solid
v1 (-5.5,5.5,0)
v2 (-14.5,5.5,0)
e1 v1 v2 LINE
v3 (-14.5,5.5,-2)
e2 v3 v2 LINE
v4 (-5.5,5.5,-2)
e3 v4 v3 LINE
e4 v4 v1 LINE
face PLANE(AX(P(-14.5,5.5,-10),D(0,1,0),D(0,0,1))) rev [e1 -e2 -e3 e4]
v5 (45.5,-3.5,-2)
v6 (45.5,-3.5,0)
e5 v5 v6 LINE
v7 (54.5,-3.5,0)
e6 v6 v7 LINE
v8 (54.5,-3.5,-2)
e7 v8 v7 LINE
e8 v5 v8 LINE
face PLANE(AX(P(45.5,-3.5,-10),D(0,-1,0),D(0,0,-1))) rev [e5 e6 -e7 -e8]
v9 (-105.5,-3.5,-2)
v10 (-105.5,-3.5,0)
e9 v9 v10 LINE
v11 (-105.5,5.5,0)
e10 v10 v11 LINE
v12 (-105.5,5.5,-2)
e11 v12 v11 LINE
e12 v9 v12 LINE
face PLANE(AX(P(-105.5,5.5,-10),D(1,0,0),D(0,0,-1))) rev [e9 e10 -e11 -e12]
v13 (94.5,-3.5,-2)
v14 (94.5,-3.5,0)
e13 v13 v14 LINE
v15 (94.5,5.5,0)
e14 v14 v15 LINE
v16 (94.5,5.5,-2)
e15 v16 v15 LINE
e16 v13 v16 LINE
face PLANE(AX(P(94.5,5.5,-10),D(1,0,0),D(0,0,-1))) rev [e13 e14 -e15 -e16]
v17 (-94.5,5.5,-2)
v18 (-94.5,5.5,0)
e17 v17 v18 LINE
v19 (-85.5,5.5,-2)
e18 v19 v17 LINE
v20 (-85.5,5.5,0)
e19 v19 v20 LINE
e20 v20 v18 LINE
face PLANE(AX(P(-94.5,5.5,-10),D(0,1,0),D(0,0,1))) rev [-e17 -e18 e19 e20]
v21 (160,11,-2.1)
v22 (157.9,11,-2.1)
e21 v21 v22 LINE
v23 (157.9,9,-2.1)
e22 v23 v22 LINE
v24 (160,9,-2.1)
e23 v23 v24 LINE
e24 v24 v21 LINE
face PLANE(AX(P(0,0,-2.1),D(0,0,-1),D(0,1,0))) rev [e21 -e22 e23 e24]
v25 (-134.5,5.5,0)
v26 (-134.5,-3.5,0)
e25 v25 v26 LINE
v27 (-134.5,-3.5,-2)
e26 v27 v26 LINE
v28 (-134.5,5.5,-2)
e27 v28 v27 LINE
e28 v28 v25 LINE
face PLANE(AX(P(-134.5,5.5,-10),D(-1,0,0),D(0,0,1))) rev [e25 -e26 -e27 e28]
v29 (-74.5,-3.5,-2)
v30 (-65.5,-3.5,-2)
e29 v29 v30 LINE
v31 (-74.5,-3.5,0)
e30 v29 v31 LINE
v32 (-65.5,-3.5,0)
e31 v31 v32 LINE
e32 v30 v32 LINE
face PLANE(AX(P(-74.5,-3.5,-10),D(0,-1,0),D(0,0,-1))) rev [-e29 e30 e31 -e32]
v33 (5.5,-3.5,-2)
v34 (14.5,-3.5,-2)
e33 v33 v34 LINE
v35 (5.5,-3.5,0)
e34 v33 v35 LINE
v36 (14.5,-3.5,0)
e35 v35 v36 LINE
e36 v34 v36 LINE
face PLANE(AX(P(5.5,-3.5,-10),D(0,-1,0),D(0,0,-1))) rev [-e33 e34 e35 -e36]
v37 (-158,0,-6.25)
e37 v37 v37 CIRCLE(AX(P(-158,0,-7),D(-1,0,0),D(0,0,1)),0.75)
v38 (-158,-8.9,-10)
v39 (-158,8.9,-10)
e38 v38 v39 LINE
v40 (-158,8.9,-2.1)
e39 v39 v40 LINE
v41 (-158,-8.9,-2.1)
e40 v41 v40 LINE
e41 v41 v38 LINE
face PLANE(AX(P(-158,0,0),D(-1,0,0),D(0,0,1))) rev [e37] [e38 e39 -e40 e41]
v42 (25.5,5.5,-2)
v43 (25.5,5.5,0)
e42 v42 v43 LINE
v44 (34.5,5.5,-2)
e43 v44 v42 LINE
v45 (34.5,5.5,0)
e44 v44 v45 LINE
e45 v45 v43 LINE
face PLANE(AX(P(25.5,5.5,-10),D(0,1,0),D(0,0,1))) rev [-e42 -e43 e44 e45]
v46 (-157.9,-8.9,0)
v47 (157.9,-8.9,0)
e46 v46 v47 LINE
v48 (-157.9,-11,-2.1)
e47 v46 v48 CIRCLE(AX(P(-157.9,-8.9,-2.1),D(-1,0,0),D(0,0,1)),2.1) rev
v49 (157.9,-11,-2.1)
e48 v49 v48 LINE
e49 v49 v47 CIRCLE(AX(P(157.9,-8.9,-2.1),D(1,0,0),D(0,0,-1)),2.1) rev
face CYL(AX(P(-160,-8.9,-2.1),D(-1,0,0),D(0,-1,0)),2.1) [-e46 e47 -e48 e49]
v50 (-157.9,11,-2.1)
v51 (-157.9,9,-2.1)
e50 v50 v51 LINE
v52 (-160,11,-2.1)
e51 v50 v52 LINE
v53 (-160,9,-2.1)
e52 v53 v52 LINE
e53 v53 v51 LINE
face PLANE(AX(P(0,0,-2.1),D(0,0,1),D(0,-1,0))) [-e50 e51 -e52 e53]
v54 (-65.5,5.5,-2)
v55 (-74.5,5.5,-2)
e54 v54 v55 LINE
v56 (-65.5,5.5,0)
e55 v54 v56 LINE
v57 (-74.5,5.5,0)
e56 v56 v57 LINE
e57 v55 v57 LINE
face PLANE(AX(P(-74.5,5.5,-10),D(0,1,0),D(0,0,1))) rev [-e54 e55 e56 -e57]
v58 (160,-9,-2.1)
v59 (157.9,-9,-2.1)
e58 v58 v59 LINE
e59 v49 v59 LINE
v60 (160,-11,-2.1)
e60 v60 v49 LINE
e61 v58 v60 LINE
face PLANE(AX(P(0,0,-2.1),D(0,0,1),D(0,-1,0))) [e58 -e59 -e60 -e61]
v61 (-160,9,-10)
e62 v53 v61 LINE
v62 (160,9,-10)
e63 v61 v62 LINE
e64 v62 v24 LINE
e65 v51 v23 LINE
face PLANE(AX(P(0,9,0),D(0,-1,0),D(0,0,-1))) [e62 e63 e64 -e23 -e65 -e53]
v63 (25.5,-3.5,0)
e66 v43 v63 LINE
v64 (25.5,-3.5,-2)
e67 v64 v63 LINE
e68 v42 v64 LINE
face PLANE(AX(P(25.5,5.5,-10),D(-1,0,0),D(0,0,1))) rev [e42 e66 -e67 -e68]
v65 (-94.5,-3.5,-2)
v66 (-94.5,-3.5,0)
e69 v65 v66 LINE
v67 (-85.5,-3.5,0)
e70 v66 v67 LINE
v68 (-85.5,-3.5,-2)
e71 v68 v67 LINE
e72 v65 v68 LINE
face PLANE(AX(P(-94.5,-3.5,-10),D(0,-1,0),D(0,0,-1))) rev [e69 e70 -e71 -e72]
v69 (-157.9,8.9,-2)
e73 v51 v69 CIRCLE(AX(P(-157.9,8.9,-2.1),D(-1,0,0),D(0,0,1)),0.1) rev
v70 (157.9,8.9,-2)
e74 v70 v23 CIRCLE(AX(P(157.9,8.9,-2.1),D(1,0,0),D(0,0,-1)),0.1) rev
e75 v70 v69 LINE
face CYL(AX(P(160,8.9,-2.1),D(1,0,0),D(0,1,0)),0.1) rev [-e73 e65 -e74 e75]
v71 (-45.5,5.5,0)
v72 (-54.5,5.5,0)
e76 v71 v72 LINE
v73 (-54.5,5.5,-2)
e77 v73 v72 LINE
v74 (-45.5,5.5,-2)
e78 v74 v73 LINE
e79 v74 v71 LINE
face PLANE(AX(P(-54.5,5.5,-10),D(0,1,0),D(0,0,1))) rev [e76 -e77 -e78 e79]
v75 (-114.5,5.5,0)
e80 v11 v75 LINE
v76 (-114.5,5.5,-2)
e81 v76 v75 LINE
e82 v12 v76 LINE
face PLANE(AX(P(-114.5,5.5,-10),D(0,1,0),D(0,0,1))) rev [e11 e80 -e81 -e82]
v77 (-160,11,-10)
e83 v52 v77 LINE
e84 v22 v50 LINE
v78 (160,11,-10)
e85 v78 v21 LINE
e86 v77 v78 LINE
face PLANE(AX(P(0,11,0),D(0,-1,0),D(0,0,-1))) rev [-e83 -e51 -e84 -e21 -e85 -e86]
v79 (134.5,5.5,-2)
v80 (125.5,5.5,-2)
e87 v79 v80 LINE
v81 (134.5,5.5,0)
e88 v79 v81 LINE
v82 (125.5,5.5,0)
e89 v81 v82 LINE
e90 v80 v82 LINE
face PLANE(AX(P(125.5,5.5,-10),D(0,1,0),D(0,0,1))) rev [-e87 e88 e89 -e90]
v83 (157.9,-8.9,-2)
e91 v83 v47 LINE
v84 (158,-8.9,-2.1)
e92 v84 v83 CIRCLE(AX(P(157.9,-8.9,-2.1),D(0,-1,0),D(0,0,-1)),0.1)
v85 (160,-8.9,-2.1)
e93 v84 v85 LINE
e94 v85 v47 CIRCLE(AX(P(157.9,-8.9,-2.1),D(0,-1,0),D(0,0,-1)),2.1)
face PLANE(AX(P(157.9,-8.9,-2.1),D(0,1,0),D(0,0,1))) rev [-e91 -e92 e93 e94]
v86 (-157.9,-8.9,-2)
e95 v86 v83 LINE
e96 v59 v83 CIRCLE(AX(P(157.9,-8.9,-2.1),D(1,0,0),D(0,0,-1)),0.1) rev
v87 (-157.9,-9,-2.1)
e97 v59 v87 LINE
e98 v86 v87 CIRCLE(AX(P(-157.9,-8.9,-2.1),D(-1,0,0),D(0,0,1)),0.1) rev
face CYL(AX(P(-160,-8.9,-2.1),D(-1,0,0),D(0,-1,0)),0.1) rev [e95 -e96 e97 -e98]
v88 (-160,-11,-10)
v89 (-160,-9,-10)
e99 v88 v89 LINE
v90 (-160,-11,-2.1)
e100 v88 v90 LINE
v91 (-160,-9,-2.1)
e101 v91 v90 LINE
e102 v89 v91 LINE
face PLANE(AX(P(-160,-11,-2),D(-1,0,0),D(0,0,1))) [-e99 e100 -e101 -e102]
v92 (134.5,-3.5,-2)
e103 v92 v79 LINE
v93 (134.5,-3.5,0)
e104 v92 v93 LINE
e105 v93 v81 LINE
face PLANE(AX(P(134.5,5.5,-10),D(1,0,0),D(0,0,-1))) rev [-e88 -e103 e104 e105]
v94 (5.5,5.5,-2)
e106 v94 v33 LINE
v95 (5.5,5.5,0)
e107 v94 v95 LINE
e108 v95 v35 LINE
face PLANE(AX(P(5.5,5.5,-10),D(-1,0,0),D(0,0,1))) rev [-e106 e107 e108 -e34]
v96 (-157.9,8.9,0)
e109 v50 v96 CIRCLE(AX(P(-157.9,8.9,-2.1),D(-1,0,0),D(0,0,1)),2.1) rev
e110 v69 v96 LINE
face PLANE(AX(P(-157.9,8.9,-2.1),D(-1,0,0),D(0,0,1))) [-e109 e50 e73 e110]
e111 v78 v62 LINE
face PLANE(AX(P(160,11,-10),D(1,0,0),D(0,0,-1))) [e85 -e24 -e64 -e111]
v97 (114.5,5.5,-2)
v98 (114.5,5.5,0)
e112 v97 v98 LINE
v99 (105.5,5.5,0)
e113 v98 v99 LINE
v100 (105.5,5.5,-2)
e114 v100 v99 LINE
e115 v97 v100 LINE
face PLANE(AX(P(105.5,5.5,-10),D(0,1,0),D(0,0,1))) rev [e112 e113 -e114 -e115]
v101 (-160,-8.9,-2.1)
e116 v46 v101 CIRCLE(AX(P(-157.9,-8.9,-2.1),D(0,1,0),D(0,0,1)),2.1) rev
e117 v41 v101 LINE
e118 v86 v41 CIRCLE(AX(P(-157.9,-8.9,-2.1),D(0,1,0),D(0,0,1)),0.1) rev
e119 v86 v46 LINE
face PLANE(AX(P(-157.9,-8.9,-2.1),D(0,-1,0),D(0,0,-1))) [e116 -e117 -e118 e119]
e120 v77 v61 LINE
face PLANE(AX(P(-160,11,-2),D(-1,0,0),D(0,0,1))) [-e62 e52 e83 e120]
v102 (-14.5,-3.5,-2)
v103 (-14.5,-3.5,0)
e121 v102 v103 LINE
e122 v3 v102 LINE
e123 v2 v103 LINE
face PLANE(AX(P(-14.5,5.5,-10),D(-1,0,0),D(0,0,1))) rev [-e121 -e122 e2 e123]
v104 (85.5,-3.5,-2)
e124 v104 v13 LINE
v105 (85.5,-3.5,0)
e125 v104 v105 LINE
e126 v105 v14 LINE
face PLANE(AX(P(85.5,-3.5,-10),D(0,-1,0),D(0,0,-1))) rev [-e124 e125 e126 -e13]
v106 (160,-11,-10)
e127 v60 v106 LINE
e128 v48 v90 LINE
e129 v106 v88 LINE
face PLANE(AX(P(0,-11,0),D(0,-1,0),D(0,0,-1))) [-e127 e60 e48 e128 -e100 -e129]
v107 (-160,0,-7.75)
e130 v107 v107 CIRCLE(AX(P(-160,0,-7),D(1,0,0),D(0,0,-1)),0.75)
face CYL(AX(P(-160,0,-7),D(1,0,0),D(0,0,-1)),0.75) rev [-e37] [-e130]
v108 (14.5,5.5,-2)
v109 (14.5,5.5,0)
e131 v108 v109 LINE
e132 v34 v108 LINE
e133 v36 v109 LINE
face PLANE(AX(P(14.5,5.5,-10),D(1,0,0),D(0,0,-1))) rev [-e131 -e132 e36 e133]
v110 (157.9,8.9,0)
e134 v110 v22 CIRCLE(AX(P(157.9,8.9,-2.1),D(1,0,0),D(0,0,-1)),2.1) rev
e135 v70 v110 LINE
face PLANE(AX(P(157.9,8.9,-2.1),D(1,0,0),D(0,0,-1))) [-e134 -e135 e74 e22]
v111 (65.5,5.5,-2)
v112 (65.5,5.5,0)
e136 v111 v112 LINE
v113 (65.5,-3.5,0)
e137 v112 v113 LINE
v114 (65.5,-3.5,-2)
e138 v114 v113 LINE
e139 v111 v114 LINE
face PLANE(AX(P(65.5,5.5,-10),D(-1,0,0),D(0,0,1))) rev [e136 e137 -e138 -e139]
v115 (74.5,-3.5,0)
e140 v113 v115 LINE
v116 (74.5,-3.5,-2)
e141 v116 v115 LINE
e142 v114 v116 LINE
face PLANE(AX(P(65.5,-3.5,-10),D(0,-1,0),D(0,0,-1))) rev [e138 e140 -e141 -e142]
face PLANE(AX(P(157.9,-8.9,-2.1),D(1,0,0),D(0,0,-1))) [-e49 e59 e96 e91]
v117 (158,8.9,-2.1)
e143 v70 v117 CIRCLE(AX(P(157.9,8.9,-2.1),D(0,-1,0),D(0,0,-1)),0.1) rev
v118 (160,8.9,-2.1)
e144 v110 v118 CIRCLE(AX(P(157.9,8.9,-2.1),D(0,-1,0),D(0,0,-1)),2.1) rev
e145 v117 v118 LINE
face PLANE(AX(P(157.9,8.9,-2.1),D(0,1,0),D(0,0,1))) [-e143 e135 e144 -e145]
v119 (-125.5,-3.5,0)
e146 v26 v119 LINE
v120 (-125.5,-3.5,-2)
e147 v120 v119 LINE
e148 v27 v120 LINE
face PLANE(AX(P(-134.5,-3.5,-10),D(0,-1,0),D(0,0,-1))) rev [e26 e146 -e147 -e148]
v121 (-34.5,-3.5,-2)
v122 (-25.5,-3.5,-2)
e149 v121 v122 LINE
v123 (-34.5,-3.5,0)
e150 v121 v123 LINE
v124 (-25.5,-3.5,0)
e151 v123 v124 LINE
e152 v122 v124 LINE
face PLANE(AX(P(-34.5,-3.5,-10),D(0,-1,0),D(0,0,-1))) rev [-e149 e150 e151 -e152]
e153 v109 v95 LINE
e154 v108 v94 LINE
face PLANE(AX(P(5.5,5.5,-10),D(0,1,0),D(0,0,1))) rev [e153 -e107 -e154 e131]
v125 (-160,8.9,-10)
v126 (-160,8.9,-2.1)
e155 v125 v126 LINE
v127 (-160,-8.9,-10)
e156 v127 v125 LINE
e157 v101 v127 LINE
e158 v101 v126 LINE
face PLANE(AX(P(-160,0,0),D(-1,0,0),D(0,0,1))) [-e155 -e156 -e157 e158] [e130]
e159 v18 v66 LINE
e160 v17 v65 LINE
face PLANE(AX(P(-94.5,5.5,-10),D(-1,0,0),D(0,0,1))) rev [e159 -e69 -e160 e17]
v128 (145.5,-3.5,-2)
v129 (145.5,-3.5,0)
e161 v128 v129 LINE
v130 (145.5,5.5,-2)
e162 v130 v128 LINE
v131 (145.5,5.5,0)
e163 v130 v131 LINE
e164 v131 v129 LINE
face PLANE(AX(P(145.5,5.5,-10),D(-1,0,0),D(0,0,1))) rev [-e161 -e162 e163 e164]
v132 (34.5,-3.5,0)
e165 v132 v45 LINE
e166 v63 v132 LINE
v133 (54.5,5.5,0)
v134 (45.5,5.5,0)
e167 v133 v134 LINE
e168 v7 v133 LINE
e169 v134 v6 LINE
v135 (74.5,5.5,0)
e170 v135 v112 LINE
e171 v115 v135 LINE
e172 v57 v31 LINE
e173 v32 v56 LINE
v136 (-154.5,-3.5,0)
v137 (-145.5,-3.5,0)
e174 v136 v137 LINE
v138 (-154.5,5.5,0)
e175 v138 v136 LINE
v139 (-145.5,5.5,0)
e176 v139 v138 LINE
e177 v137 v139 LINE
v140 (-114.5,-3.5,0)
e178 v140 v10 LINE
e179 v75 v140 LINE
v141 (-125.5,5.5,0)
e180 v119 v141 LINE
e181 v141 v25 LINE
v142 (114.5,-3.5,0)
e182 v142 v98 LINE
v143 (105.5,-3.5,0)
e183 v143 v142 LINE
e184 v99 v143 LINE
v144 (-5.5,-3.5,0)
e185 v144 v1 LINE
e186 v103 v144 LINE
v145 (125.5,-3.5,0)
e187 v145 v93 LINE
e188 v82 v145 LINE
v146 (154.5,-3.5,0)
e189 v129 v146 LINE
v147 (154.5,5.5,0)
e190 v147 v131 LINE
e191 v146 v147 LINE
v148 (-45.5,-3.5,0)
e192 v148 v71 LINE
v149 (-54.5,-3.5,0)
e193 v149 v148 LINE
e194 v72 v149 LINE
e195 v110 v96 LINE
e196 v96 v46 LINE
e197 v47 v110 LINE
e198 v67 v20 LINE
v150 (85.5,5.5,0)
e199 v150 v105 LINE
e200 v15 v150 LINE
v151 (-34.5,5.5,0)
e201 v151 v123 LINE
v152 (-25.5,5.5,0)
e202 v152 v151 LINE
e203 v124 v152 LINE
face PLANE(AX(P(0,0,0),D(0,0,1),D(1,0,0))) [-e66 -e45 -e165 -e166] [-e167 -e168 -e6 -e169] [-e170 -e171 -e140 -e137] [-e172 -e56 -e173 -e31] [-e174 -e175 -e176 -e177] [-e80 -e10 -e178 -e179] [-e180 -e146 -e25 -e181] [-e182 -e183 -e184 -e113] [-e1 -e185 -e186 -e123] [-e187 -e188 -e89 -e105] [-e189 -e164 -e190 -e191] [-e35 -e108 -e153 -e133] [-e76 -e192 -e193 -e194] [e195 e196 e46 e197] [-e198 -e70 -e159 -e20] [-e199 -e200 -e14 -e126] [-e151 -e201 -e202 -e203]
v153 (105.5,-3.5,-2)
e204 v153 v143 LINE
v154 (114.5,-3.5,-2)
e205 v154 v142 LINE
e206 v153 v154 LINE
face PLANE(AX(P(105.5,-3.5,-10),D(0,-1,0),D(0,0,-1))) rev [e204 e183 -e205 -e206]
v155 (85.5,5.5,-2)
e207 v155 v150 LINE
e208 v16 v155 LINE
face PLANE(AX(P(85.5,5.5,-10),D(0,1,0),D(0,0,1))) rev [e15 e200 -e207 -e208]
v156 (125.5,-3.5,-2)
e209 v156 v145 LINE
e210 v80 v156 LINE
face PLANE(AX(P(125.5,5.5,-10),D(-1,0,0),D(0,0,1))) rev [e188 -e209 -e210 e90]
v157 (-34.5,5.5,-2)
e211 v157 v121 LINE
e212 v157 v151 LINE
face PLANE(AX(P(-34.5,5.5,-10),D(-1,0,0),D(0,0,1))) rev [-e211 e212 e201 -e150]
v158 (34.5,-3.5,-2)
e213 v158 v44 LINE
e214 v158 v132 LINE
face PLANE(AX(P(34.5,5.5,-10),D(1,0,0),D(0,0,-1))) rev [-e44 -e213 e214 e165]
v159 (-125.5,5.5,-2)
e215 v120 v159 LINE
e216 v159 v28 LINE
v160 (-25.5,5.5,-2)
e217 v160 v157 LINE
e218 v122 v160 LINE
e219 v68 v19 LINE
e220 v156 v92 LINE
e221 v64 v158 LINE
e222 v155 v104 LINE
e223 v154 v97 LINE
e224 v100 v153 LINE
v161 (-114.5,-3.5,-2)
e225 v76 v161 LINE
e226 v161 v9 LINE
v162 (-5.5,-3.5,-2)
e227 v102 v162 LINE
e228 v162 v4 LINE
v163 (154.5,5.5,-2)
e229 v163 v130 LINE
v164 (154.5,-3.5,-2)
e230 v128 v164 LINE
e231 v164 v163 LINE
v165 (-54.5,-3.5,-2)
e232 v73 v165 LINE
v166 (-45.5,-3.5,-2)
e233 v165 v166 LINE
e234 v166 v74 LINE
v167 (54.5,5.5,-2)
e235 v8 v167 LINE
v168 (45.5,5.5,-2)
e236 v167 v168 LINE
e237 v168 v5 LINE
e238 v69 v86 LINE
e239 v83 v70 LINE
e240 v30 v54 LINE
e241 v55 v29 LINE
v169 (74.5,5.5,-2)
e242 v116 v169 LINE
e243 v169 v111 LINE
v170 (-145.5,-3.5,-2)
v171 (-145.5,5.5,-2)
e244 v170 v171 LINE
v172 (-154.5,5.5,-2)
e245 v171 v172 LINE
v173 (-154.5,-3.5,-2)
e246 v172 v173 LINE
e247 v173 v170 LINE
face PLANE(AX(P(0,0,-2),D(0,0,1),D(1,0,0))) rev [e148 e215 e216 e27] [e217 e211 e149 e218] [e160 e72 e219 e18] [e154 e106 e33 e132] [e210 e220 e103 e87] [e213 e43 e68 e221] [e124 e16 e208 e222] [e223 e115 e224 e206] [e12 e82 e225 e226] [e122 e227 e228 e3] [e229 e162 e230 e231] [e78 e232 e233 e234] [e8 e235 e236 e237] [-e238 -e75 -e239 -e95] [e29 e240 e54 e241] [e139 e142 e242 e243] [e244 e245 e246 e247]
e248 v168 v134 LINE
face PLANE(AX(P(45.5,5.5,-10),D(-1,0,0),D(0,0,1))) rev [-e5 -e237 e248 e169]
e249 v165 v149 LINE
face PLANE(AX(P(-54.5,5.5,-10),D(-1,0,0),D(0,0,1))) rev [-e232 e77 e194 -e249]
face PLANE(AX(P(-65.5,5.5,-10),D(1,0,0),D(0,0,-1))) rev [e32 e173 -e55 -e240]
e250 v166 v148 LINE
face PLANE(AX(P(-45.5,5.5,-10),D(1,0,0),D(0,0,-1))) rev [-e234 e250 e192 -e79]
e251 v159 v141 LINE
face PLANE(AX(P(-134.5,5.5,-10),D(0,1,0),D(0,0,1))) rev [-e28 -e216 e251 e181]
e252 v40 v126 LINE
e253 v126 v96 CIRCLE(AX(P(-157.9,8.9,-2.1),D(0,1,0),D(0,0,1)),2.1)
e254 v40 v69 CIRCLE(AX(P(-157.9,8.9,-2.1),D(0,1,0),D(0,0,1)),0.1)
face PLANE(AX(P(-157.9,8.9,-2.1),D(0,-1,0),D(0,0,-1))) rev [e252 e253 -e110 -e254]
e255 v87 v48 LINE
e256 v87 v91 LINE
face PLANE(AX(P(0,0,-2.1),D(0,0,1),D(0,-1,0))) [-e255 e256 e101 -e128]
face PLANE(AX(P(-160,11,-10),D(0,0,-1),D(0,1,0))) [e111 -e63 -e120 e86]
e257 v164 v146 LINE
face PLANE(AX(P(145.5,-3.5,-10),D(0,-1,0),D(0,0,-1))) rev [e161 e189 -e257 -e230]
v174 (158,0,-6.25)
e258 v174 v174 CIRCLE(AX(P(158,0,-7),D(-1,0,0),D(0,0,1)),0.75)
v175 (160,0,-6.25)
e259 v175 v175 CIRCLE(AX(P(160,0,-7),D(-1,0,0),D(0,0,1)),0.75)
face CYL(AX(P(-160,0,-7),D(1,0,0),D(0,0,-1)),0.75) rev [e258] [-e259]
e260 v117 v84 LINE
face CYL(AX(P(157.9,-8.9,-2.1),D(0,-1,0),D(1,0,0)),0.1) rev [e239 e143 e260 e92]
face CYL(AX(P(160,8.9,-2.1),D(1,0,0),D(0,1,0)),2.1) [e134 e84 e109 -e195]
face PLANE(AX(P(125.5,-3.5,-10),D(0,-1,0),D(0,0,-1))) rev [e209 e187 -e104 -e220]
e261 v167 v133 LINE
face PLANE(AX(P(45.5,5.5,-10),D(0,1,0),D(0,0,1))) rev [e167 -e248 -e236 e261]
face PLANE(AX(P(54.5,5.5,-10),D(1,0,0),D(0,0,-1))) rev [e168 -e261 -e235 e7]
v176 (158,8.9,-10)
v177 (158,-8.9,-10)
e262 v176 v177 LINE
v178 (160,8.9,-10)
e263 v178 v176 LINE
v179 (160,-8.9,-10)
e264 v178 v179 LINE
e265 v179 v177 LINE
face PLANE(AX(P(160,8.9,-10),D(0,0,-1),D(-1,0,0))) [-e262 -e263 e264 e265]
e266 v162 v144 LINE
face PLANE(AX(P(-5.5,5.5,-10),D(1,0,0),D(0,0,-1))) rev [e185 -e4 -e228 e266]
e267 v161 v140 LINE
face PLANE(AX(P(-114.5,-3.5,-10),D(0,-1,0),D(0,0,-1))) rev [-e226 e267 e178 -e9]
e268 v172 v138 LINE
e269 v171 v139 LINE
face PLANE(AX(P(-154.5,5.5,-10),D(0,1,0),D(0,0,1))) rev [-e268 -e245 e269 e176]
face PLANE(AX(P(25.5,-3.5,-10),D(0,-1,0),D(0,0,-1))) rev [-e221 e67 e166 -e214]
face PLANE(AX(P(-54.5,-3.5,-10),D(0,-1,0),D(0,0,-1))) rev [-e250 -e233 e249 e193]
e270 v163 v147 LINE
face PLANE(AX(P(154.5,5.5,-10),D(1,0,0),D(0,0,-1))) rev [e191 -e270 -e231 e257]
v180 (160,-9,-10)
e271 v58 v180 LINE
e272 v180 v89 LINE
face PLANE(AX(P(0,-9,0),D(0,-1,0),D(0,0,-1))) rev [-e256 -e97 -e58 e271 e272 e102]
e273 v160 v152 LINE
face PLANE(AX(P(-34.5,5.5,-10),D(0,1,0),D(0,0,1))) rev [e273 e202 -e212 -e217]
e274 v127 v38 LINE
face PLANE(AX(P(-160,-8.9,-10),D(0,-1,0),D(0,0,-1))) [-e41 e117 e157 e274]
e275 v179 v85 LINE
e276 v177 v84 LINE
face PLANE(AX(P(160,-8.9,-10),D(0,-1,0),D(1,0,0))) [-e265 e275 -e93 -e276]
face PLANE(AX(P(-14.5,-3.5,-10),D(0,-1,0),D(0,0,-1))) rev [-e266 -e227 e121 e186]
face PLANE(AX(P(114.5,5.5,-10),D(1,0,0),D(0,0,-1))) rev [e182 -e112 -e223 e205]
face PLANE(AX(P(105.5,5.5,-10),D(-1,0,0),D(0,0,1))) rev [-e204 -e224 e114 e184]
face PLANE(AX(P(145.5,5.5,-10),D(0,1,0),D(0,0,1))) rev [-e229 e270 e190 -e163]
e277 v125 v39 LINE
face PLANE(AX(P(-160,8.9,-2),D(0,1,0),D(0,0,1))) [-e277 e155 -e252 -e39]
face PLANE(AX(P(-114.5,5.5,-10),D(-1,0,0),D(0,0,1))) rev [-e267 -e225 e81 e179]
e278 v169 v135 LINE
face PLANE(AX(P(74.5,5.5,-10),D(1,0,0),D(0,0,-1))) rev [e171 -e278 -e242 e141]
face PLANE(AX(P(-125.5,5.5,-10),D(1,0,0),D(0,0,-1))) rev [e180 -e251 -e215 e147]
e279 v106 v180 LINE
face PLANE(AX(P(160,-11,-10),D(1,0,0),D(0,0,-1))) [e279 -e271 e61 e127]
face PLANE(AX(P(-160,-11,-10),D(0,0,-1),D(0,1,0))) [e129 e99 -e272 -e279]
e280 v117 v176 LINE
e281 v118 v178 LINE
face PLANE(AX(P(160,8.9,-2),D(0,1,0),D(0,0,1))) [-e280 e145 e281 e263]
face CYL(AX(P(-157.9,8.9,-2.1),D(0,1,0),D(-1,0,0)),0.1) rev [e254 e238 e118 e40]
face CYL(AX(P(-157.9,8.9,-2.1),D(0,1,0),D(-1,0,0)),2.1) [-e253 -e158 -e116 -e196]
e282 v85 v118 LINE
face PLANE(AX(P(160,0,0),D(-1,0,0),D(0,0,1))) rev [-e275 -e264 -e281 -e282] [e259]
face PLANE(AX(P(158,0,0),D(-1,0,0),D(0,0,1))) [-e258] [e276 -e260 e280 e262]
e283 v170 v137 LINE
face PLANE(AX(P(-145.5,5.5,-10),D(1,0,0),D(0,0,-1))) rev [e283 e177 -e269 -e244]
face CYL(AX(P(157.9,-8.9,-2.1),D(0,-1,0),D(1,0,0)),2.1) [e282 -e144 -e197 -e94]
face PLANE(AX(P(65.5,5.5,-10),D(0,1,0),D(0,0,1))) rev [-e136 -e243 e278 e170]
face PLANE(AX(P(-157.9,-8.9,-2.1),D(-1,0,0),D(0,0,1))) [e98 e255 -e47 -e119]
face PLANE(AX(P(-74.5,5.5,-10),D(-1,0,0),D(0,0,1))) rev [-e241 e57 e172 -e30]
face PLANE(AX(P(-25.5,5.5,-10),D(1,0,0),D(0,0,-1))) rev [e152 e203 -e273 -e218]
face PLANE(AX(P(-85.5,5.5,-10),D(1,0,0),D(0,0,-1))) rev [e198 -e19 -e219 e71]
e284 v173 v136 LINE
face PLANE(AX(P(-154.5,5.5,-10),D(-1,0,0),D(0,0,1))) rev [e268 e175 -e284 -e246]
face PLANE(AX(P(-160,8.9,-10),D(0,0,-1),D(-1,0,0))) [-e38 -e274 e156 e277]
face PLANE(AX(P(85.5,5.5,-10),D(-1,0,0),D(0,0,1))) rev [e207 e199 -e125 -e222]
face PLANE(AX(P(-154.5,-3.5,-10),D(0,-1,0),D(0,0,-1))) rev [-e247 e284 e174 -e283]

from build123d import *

# Parameters (mm, degrees)
SKETCH_1_W                         = 320
SKETCH_1_H                         = 22
SM_BASE_FLANGE_1_DEPTH             = 2
SM_EDGE_FLANGE_1_STRIP_W           = 8.2
SM_EDGE_FLANGE_1_STRIP_H           = 2
SM_EDGE_FLANGE_1_STRIP_CUT_DEPTH   = 320
SM_EDGE_FLANGE_1_STRIP_2_W         = 8.2
SM_EDGE_FLANGE_1_STRIP_2_H         = 2
SM_EDGE_FLANGE_1_STRIP_CUT_2_DEPTH = 320
SM_EDGE_FLANGE_1_DEPTH             = 320
SM_EDGE_FLANGE_1_BEND_DEPTH        = 320
SM_START                           = -11
SM_EDGE_FLANGE_2_DEPTH             = 22
SM_EDGE_FLANGE_2_2_DEPTH           = 2.1
SM_START_2                         = 8.9
SM_EDGE_FLANGE_2_3_DEPTH           = 2.1
SM_START_3                         = -8.9
SM_EDGE_FLANGE_2_4_DEPTH           = 17.8
SKETCH_18_W                        = 9
SKETCH_18_H                        = 9
CUT_EXTRUDE_1_DEPTH                = 10
PATTERN_LINEAR_1_COUNT             = 20
PATTERN_LINEAR_1_PITCH             = 20
CUT_EXTRUDE_2_DEPTH                = 321.345126387
CUT_EXTRUDE_2_DEPTH_BACK           = 321.345126387
SKETCH_19_R                        = 0.75


# Read off the part's stored shape, not the designer's step: 边线-法兰2
# Sheet-metal steps are written as plain solids
with BuildPart() as part:
    # Sketch 1 → 基体-法兰1 (new body)
    with BuildSketch(Plane.XY):
        Rectangle(SKETCH_1_W, SKETCH_1_H)
    extrude(amount=-SM_BASE_FLANGE_1_DEPTH)

    # 边线-法兰1 strip (across the edge) → 边线-法兰1 strip cut (cut)
    with BuildSketch(Plane(origin=(160, -11, -2), x_dir=(0, 1, 0), z_dir=(-1, 0, 0))):
        with Locations((-2, -1)):
            Rectangle(SM_EDGE_FLANGE_1_STRIP_W, SM_EDGE_FLANGE_1_STRIP_H)
    extrude(amount=SM_EDGE_FLANGE_1_STRIP_CUT_DEPTH, mode=Mode.SUBTRACT)

    # 边线-法兰1 strip 2 (across the edge) → 边线-法兰1 strip cut 2 (cut)
    with BuildSketch(Plane(origin=(-160, 11, -2), x_dir=(0, -1, 0), z_dir=(1, 0, 0))):
        with Locations((-2, -1)):
            Rectangle(SM_EDGE_FLANGE_1_STRIP_2_W, SM_EDGE_FLANGE_1_STRIP_2_H)
    extrude(amount=SM_EDGE_FLANGE_1_STRIP_CUT_2_DEPTH, mode=Mode.SUBTRACT)

    # 边线-法兰1 section (across the edge) → 边线-法兰1 (add)
    with BuildSketch(Plane(origin=(160, -11, -2), x_dir=(0, 1, 0), z_dir=(-1, 0, 0))):
        with BuildLine():
            Line((0, 0.1), (0, 8))
            Line((0, 8), (2, 8))
            Line((2, 8), (2, 0.1))
            ThreePointArc((2, 0.1), (2.029289322, 0.029289322), (2.1, 0))
            Line((2.1, 0), (2.1, -2))
            ThreePointArc((2.1, -2), (0.61507576, -1.38492424), (0, 0.1))
        make_face()
    extrude(amount=SM_EDGE_FLANGE_1_DEPTH)

    # 边线-法兰1 section 2 (across the edge) → 边线-法兰1 bend (add)
    with BuildSketch(Plane(origin=(-160, 11, -2), x_dir=(0, -1, 0), z_dir=(1, 0, 0))):
        with BuildLine():
            Line((0, 0.1), (0, 8))
            Line((0, 8), (2, 8))
            Line((2, 8), (2, 0.1))
            ThreePointArc((2, 0.1), (2.029289322, 0.029289322), (2.1, 0))
            Line((2.1, 0), (2.1, -2))
            ThreePointArc((2.1, -2), (0.61507576, -1.38492424), (0, 0.1))
        make_face()
    extrude(amount=SM_EDGE_FLANGE_1_BEND_DEPTH)

    # 边线-法兰2 outline → 边线-法兰2 (cut)
    with BuildSketch(Plane(origin=(0, 0, 0), x_dir=(1, 0, 0), z_dir=(0, 1, 0)).offset(SM_START)):
        with BuildLine():
            Line((158, 2.1), (157.9, 2.1))
            Line((157.9, 2.1), (157.9, 2))
            ThreePointArc((157.9, 2), (157.970710678, 2.029289322), (158, 2.1))
        make_face()
        with BuildLine():
            ThreePointArc((160, 2.1), (159.38492424, 0.61507576), (157.9, 0))
            Line((157.9, 0), (160, 0))
            Line((160, 0), (160, 2.1))
        make_face()
        with BuildLine():
            ThreePointArc((-158, 2.1), (-157.970710678, 2.029289322), (-157.9, 2))
            Line((-157.9, 2), (-157.9, 2.1))
            Line((-157.9, 2.1), (-158, 2.1))
        make_face()
        with BuildLine():
            Line((-160, 0), (-157.9, 0))
            ThreePointArc((-157.9, 0), (-159.38492424, 0.61507576), (-160, 2.1))
            Line((-160, 2.1), (-160, 0))
        make_face()
    extrude(amount=SM_EDGE_FLANGE_2_DEPTH, mode=Mode.SUBTRACT)

    # Sm Edge Flange 2 2 outline → Sm Edge Flange 2 2 (cut)
    with BuildSketch(Plane(origin=(0, 0, 0), x_dir=(1, 0, 0), z_dir=(0, 1, 0)).offset(SM_START)):
        with BuildLine():
            Line((160, 2.1), (158, 2.1))
            ThreePointArc((158, 2.1), (157.970710678, 2.029289322), (157.9, 2))
            Line((157.9, 2), (157.9, 0))
            ThreePointArc((157.9, 0), (159.38492424, 0.61507576), (160, 2.1))
        make_face()
        with BuildLine():
            ThreePointArc((-160, 2.1), (-159.38492424, 0.61507576), (-157.9, 0))
            Line((-157.9, 0), (-157.9, 2))
            ThreePointArc((-157.9, 2), (-157.970710678, 2.029289322), (-158, 2.1))
            Line((-158, 2.1), (-160, 2.1))
        make_face()
    extrude(amount=SM_EDGE_FLANGE_2_2_DEPTH, mode=Mode.SUBTRACT)

    # Sm Edge Flange 2 3 outline → Sm Edge Flange 2 3 (cut)
    with BuildSketch(Plane(origin=(0, 0, 0), x_dir=(1, 0, 0), z_dir=(0, 1, 0)).offset(SM_START_2)):
        with BuildLine():
            Line((160, 2.1), (158, 2.1))
            ThreePointArc((158, 2.1), (157.970710678, 2.029289322), (157.9, 2))
            Line((157.9, 2), (157.9, 0))
            ThreePointArc((157.9, 0), (159.38492424, 0.61507576), (160, 2.1))
        make_face()
        with BuildLine():
            ThreePointArc((-160, 2.1), (-159.38492424, 0.61507576), (-157.9, 0))
            Line((-157.9, 0), (-157.9, 2))
            ThreePointArc((-157.9, 2), (-157.970710678, 2.029289322), (-158, 2.1))
            Line((-158, 2.1), (-160, 2.1))
        make_face()
    extrude(amount=SM_EDGE_FLANGE_2_3_DEPTH, mode=Mode.SUBTRACT)

    # Sm Edge Flange 2 4 outline → Sm Edge Flange 2 4 (add)
    with BuildSketch(Plane(origin=(0, 0, 0), x_dir=(1, 0, 0), z_dir=(0, 1, 0)).offset(SM_START_3)):
        with BuildLine():
            Line((158, 10), (158, 2.1))
            ThreePointArc((158, 2.1), (157.970710678, 2.029289322), (157.9, 2))
            Line((157.9, 2), (159.997617696, 2))
            ThreePointArc((159.997617696, 2), (159.99940434, 2.049985814), (160, 2.1))
            Line((160, 2.1), (160, 10))
            Line((160, 10), (158, 10))
        make_face()
        with BuildLine():
            Line((-159.997617696, 2), (-157.9, 2))
            ThreePointArc((-157.9, 2), (-157.970710678, 2.029289322), (-158, 2.1))
            Line((-158, 2.1), (-158, 10))
            Line((-158, 10), (-160, 10))
            Line((-160, 10), (-160, 2.1))
            ThreePointArc((-160, 2.1), (-159.99940434, 2.049985814), (-159.997617696, 2))
        make_face()
    extrude(amount=SM_EDGE_FLANGE_2_4_DEPTH)

    # 草图18 → 切除-拉伸1 (cut)
    with BuildSketch(Plane.XY):
        with Locations((-150, 1)):
            Rectangle(SKETCH_18_W, SKETCH_18_H)
    cut_extrude_1 = extrude(amount=-CUT_EXTRUDE_1_DEPTH, mode=Mode.SUBTRACT)

    # 阵列(线性)1: 切除-拉伸1 ×20
    with Locations(*[(i * PATTERN_LINEAR_1_PITCH, 0, 0) for i in range(1, PATTERN_LINEAR_1_COUNT)]):
        add(cut_extrude_1, mode=Mode.SUBTRACT)

    # 草图19 → 切除-拉伸2 (cut, two sides: drawn at the far end of the back side and taken through both)
    with BuildSketch(Plane(origin=(160, 0, 0), x_dir=(0, 0, -1), z_dir=(1, 0, 0)).offset(-CUT_EXTRUDE_2_DEPTH_BACK)):
        with Locations(Location((7, 0, 0), (0, 0, 180))):
            Circle(SKETCH_19_R)
    extrude(amount=CUT_EXTRUDE_2_DEPTH + CUT_EXTRUDE_2_DEPTH_BACK, mode=Mode.SUBTRACT)


solid = part.part
